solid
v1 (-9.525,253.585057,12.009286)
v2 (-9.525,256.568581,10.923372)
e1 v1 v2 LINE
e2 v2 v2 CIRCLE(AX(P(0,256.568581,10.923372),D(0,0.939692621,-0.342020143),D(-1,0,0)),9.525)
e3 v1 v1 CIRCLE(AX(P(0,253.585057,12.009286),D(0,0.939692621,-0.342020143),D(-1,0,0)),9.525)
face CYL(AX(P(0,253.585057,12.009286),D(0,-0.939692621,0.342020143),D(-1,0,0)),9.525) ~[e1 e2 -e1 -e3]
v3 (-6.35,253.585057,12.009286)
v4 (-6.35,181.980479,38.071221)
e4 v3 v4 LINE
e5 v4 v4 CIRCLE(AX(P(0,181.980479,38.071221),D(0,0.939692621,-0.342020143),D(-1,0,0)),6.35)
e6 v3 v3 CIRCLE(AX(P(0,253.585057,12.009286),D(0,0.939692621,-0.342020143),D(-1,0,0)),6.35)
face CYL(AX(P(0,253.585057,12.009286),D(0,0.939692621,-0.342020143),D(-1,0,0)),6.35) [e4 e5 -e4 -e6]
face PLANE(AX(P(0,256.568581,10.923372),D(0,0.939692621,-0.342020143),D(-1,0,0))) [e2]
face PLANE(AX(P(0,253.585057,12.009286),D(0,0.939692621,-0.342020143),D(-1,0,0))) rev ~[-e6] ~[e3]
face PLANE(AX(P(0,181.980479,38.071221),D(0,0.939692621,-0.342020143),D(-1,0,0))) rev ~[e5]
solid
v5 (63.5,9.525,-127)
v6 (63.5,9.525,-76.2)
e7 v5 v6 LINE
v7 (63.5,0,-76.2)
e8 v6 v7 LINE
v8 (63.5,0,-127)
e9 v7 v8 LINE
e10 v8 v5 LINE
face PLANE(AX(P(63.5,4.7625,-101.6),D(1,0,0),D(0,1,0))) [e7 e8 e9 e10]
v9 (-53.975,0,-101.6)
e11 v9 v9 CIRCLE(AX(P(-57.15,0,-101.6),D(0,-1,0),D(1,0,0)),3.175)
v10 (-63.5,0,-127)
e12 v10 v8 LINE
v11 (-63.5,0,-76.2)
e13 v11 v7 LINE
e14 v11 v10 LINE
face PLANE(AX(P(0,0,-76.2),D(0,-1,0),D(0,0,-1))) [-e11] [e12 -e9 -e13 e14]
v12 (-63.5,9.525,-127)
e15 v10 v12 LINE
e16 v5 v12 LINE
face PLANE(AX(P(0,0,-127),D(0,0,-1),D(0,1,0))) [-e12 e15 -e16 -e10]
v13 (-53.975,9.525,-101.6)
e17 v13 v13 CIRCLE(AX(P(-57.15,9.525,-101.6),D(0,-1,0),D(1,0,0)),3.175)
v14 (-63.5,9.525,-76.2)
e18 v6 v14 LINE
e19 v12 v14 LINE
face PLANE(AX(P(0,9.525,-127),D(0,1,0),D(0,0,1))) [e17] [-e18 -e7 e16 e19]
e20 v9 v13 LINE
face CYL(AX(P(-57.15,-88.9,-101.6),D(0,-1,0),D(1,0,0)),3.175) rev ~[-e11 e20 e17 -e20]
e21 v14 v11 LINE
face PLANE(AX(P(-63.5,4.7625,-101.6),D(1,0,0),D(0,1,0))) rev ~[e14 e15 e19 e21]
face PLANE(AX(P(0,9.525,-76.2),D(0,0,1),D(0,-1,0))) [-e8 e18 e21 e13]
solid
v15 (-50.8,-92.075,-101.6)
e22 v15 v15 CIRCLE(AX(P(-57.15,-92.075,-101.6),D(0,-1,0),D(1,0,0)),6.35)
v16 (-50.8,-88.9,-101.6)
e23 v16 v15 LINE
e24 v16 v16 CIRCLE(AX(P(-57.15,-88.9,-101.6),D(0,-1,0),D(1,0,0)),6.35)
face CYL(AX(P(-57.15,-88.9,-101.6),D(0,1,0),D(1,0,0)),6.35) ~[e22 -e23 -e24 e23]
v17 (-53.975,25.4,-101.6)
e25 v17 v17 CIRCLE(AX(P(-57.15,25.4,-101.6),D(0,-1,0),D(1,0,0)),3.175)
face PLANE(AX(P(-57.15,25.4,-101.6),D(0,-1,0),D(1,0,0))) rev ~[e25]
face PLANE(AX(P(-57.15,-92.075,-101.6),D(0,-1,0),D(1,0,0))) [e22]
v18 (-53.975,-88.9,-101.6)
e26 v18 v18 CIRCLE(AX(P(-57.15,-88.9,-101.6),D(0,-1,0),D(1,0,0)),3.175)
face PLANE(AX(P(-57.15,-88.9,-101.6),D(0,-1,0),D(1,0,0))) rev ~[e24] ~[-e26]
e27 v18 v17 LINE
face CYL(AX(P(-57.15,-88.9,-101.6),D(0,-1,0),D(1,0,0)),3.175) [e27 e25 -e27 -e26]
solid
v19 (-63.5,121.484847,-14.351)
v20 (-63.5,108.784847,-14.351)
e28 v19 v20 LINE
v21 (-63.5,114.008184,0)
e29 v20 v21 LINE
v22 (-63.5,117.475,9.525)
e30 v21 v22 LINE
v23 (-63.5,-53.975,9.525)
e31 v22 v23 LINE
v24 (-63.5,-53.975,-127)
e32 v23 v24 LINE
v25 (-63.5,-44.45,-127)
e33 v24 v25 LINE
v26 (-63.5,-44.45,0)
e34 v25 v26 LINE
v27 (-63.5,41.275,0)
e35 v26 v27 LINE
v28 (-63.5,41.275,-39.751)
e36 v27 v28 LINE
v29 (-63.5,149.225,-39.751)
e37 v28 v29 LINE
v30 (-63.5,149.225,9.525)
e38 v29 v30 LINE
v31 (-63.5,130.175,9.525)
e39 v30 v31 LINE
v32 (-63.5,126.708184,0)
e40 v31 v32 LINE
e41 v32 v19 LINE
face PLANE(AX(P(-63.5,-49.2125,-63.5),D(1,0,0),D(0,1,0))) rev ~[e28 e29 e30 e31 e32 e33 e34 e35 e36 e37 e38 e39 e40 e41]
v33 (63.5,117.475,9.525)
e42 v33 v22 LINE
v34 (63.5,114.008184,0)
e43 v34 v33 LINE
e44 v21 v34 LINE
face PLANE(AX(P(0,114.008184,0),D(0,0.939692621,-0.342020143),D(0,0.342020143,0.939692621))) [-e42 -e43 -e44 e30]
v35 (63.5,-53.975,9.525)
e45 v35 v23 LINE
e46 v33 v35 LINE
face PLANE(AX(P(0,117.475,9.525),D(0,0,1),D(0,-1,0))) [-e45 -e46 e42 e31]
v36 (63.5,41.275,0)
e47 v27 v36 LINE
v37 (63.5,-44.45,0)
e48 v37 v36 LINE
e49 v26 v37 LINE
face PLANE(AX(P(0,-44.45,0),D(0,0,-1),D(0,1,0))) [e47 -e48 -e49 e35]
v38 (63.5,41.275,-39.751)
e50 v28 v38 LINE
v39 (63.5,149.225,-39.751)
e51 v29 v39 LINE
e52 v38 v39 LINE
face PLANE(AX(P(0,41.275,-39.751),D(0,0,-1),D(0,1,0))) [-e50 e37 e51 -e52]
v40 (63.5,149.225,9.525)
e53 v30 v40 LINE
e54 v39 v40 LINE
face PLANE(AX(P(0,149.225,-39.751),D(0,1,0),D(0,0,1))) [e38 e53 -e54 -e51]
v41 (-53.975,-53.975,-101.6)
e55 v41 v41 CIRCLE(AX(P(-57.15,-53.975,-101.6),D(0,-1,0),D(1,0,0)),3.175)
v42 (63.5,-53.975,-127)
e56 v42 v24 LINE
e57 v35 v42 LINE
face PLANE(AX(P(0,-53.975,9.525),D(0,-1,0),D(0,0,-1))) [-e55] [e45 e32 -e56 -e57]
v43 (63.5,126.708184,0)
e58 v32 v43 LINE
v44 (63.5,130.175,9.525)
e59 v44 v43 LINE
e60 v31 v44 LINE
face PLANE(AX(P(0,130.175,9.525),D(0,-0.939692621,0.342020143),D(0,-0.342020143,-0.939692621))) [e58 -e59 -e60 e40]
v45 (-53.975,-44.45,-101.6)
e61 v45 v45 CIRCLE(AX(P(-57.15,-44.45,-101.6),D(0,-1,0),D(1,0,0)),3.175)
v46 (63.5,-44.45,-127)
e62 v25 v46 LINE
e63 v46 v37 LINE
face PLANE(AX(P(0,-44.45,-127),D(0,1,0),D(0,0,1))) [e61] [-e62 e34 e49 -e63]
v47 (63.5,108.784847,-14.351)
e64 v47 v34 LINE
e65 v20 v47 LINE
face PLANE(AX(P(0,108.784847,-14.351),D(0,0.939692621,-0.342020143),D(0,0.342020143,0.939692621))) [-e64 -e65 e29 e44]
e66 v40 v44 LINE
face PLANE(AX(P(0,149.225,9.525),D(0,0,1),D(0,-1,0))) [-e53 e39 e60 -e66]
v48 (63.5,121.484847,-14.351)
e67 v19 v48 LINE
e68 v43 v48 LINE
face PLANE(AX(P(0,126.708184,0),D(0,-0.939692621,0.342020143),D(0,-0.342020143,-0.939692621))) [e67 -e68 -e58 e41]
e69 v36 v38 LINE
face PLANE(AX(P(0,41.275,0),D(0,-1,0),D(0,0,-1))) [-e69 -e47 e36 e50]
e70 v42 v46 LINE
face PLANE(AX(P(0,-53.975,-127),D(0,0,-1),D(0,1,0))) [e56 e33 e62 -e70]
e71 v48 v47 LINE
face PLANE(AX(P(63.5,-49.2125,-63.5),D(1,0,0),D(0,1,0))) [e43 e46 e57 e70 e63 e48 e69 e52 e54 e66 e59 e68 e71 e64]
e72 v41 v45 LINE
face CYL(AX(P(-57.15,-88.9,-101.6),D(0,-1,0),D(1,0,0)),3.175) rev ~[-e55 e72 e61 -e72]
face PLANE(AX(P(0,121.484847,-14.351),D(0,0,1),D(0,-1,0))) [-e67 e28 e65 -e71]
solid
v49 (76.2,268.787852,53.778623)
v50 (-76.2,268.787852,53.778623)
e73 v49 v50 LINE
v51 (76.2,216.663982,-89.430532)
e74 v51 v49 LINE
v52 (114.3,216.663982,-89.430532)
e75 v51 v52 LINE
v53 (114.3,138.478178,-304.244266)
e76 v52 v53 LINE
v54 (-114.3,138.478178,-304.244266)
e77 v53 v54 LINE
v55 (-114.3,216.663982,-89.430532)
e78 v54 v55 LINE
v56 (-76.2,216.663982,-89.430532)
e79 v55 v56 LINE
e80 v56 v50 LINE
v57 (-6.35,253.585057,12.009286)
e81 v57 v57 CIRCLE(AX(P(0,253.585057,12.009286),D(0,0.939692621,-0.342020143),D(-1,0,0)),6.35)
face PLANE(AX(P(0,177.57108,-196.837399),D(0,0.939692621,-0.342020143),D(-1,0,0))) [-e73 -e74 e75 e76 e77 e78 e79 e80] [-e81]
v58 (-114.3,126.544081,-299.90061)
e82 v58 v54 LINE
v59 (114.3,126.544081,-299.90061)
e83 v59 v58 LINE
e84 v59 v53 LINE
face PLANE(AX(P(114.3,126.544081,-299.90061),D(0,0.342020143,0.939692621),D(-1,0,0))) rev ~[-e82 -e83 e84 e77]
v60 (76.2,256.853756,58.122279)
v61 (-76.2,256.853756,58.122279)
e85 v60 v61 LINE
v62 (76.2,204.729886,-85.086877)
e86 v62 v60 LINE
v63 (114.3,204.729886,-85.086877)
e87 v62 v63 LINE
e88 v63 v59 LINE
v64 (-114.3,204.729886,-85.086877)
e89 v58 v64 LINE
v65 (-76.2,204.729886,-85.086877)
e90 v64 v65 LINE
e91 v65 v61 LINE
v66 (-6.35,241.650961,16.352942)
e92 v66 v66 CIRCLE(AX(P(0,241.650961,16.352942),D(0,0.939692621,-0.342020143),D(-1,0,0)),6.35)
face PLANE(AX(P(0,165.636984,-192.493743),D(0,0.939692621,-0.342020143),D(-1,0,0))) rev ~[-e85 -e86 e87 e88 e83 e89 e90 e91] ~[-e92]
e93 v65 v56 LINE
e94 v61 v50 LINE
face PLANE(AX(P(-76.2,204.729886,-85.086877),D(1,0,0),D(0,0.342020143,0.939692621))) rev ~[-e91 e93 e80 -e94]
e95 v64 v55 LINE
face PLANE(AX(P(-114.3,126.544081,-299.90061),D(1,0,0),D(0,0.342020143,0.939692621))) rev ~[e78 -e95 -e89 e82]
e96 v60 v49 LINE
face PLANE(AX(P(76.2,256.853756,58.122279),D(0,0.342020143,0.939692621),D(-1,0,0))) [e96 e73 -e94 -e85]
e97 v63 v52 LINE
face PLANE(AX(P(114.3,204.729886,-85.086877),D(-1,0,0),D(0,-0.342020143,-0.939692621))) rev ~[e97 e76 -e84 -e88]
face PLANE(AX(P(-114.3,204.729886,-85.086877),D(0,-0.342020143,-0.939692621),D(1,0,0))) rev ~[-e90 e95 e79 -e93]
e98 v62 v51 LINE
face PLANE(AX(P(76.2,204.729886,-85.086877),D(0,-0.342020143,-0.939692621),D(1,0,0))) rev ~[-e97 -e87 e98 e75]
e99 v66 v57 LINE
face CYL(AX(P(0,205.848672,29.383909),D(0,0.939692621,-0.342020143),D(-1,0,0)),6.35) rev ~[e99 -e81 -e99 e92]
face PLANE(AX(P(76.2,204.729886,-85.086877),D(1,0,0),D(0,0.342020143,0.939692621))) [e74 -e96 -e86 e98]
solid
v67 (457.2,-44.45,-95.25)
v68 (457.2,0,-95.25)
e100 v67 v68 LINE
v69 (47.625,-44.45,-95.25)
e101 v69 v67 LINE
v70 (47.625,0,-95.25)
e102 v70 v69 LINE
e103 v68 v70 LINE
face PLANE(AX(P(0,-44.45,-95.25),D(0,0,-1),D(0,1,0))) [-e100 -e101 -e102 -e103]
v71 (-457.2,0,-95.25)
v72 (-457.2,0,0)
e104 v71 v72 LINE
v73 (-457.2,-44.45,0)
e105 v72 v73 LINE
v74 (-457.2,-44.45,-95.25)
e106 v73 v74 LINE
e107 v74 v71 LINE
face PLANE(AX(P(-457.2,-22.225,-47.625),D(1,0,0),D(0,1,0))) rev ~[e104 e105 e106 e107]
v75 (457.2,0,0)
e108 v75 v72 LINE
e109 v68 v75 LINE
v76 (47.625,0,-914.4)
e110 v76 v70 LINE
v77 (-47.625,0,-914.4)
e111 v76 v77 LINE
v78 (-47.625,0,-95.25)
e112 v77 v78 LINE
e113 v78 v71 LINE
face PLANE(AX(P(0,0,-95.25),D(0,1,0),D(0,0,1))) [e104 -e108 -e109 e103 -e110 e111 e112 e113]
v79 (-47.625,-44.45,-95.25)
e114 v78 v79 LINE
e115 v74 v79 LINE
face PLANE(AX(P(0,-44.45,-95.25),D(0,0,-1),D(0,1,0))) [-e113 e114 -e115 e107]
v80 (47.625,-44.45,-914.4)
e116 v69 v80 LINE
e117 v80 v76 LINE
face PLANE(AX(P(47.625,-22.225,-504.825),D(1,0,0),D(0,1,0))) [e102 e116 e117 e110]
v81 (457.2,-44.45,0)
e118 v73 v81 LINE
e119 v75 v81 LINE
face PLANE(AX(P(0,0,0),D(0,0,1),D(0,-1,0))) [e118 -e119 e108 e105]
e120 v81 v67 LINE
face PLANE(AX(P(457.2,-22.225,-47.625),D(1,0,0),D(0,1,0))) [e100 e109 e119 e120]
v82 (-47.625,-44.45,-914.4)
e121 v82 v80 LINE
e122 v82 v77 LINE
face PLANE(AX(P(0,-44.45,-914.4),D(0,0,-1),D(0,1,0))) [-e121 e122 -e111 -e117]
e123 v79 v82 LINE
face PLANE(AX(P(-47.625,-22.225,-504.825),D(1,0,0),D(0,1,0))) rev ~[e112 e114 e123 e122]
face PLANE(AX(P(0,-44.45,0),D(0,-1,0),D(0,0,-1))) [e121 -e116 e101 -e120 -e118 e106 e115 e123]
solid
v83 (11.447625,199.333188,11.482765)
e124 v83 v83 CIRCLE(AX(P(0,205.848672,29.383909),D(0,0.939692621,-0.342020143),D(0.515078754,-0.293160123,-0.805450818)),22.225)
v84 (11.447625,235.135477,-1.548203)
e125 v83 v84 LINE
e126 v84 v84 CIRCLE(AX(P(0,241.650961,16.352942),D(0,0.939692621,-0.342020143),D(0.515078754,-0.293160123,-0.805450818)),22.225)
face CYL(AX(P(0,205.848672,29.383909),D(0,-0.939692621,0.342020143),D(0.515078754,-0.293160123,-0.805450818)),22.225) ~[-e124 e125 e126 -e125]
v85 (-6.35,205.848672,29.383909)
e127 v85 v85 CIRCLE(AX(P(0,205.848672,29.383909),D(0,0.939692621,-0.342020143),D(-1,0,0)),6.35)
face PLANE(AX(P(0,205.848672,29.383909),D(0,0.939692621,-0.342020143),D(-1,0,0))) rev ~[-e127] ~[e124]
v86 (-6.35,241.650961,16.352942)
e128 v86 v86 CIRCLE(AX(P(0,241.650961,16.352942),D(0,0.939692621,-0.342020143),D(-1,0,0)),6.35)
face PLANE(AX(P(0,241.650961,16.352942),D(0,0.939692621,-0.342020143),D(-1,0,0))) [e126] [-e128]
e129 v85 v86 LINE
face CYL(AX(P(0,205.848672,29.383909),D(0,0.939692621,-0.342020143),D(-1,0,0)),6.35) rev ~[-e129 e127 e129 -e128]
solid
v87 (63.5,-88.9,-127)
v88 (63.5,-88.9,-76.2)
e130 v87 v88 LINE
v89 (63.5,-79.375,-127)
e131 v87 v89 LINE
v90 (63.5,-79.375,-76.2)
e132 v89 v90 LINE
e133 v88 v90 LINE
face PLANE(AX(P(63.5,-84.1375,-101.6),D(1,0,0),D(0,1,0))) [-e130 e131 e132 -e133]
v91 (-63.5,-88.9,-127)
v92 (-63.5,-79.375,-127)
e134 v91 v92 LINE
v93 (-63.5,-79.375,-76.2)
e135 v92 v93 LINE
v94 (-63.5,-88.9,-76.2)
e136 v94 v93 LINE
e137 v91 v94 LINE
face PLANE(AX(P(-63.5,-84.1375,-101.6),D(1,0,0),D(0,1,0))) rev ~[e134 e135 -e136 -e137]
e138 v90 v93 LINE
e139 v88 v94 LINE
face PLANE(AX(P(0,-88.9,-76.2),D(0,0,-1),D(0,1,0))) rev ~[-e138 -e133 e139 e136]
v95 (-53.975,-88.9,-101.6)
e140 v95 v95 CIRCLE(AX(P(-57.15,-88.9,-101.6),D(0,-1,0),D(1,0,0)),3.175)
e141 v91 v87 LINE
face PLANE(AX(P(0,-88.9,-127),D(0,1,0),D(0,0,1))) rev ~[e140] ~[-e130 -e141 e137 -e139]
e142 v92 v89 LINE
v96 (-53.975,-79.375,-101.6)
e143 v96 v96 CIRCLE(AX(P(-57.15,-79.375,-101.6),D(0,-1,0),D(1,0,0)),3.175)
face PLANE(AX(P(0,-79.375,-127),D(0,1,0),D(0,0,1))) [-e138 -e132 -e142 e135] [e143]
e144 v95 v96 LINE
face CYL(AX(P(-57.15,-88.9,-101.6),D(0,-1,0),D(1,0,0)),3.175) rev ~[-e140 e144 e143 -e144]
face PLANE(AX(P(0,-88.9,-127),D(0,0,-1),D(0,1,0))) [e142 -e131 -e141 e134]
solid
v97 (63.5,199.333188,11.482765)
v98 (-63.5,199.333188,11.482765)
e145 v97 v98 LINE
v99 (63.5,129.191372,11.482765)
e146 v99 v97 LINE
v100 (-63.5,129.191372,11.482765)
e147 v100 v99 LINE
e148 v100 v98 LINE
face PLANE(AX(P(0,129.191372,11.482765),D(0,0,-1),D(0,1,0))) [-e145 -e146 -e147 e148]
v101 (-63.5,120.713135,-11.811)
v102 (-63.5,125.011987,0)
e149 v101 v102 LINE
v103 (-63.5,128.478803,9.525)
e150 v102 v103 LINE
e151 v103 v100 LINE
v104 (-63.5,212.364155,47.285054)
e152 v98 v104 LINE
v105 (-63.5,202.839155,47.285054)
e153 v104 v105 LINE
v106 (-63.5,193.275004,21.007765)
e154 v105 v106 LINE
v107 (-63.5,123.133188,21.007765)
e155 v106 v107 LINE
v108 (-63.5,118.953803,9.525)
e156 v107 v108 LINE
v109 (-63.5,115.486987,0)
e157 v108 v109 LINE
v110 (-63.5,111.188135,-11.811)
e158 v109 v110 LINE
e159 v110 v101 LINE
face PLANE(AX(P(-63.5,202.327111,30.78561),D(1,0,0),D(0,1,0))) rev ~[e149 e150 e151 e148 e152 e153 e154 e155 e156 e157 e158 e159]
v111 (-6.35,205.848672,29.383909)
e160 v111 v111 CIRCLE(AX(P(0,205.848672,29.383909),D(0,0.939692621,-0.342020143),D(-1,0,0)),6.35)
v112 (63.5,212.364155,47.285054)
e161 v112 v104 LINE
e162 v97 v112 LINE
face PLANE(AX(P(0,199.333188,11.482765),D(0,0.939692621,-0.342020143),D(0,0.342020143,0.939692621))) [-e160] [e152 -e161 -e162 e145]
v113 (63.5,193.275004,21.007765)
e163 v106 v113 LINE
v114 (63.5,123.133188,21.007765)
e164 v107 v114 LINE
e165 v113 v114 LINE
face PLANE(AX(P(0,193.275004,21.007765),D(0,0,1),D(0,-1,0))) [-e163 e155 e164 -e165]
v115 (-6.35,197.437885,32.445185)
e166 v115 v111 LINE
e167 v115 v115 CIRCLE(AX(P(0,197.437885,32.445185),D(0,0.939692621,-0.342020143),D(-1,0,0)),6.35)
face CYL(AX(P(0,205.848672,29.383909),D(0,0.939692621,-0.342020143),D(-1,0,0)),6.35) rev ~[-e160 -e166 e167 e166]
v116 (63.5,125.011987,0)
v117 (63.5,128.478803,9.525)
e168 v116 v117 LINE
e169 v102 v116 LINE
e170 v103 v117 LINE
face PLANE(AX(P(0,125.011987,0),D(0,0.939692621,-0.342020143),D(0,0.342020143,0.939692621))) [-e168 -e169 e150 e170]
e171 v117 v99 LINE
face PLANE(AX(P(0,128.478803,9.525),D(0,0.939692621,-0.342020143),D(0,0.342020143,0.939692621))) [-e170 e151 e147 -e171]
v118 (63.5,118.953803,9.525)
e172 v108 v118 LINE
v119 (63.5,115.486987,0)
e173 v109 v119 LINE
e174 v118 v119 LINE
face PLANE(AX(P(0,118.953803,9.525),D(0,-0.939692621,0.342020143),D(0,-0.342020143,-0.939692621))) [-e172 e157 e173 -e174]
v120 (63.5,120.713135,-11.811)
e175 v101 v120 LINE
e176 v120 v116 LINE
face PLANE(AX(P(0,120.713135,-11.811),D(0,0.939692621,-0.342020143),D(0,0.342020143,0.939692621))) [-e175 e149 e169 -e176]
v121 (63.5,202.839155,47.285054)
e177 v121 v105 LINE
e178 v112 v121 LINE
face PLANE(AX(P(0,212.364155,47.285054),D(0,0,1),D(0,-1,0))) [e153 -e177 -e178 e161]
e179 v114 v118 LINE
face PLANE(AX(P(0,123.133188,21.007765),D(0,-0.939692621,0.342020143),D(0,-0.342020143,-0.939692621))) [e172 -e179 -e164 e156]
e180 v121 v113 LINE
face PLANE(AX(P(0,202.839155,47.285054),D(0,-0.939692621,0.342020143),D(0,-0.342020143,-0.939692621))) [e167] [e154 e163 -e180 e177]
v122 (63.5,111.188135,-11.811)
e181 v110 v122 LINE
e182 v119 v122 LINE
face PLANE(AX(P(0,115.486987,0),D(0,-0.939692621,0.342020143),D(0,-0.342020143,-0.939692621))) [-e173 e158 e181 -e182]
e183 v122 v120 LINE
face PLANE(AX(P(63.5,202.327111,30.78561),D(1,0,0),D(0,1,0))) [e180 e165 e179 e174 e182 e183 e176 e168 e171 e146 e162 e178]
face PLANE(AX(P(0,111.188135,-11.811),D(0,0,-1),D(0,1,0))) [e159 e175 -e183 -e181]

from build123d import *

# Parameters (mm, degrees)
F1_DEPTH  = 47.625
F2_DEPTH  = 457.2
F3_DEPTH  = 63.5
F0_W      = 9.525
F0_H      = 50.8
F4_DEPTH  = 63.5
F5_R      = 6.35
F6_DEPTH  = 38.1
F7_W      = 152.4
F7_H      = 152.4
F8_DEPTH  = 12.7
F9_DEPTH  = 76.2
F10_R     = 9.525
F10_R_2   = 6.35
F11_DEPTH = 3.175
F12_DEPTH = 76.2
F13_R     = 3.175
F14_DEPTH = 127
F15_DEPTH = 114.3
F16_DEPTH = 3.175


with BuildPart() as f1:
    # F0 (on Right) → F1 (new body, symmetric)
    with BuildSketch(Plane.YZ):
        Polygon((0, -95.25), (-44.45, -95.25), (-44.45, -127), (-44.45, -914.4), (0, -914.4), (0, -127), align=None)
    extrude(amount=F1_DEPTH, both=True)

    # F0 (on Right) → F2 (join, symmetric)
    with BuildSketch(Plane.YZ):
        Polygon((0, 0), (-44.45, 0), (-44.45, -95.25), (0, -95.25), (0, -76.2), align=None)
    extrude(amount=F2_DEPTH, both=True)


with BuildPart() as f3:
    # F0 (on Right) → F3 (new body, symmetric)
    with BuildSketch(Plane.YZ):
        Polygon((-44.45, -95.25), (-44.45, 0), (-53.975, 0), (-53.975, -127), (-44.45, -127), align=None)
        Polygon((-53.975, 0), (-44.45, 0), (0, 0), (41.275, 0), (114.0081835186, 0), (117.475, 9.525), (-53.975, 9.525), align=None)
        Polygon((114.0081835186, 0), (41.275, 0), (41.275, -39.751), (149.225, -39.751), (149.225, 0), (126.7081835186, 0), (121.4848466867, -14.351), (108.7848466867, -14.351), align=None)
        Polygon((126.7081835186, 0), (149.225, 0), (149.225, 9.525), (130.175, 9.525), align=None)
    extrude(amount=F3_DEPTH, both=True)


with BuildPart() as f3b:
    # F0 (on Right) → F3, piece 2 (new body, symmetric)
    with BuildSketch(Plane.YZ):
        Polygon((9.525, -76.2), (0, -76.2), (0, -95.25), (0, -127), (9.525, -127), align=None)
    extrude(amount=F3_DEPTH, both=True)


with BuildPart() as f3c:
    # F0 (on Right) → F3, piece 3 (new body, symmetric)
    with BuildSketch(Plane.YZ):
        with Locations((-84.1375, -101.6)):
            Rectangle(F0_W, F0_H)
    extrude(amount=F3_DEPTH, both=True)


with BuildPart() as f4:
    # F0 (on Right) → F4 (new body, symmetric)
    with BuildSketch(Plane.YZ):
        Polygon((202.8391554729, 47.2850536329), (193.2750044936, 21.0077647809), (199.3331880122, 21.0077647809), (199.3331880122, 11.4827647809), (212.3641554729, 47.2850536329), align=None)
        Polygon((199.3331880122, 21.0077647809), (193.2750044936, 21.0077647809), (189.8081880122, 11.4827647809), (199.3331880122, 11.4827647809), align=None)
        Polygon((132.6581880122, 21.0077647809), (129.1913715308, 11.4827647809), (130.887568106, 11.4827647809), (134.3543845873, 21.0077647809), align=None)
        Polygon((132.6581880122, 21.0077647809), (123.1331880122, 21.0077647809), (123.1331880122, 11.4827647809), (129.1913715308, 11.4827647809), align=None)
        Polygon((123.1331880122, 21.0077647809), (118.9538034249, 9.525), (128.4788034249, 9.525), (129.1913715308, 11.4827647809), (123.1331880122, 11.4827647809), align=None)
        Polygon((118.9538034249, 9.525), (115.4869869435, 0), (125.0119869435, 0), (128.4788034249, 9.525), align=None)
        Polygon((125.0119869435, 0), (115.4869869435, 0), (111.1881345066, -11.811), (120.7131345066, -11.811), align=None)
        Polygon((193.2750044936, 21.0077647809), (134.3543845873, 21.0077647809), (130.887568106, 11.4827647809), (189.8081880122, 11.4827647809), align=None)
    extrude(amount=F4_DEPTH, both=True)


with BuildPart() as f6:
    # F5 (on face) → F6 (new body)
    with BuildSketch(Plane(origin=(0, 172.325145046, -62.7212234124), x_dir=(-1, 0, 0), z_dir=(0, 0.9396926208, -0.3420201433))):
        with BuildLine():
            ThreePointArc((11.4476252996, 78.9662348644), (19.3439150288, 87.0725802482), (22.225, 98.0162348644))
            ThreePointArc((22.225, 98.0162348644), (19.3439150288, 108.9598894806), (11.4476252996, 117.0662348644))
            Line((11.4476252996, 117.0662348644), (-11.4476252996, 117.0662348644))
            ThreePointArc((-11.4476252996, 117.0662348644), (-22.225, 98.0162348644), (-11.4476252996, 78.9662348644))
            Line((-11.4476252996, 78.9662348644), (11.4476252996, 78.9662348644))
        make_face()
        with Locations((0, 98.0162348644)):
            Circle(F5_R, mode=Mode.SUBTRACT)
        with Locations((0, 98.0162348644)):
            Circle(F5_R)
        with BuildLine():
            Line((-11.4476252996, 117.0662348644), (11.4476252996, 117.0662348644))
            ThreePointArc((11.4476252996, 117.0662348644), (0, 120.2412348644), (-11.4476252996, 117.0662348644))
        make_face()
        with BuildLine():
            ThreePointArc((-11.4476252996, 78.9662348644), (0, 75.7912348644), (11.4476252996, 78.9662348644))
            Line((11.4476252996, 78.9662348644), (-11.4476252996, 78.9662348644))
        make_face()
    extrude(amount=F6_DEPTH)


with BuildPart() as f8:
    # F7 (on face) → F8 (new body)
    with BuildSketch(Plane(origin=(0, 208.127433898, -75.7521908731), x_dir=(-1, 0, 0), z_dir=(0, 0.9396926208, -0.3420201433))):
        Polygon((114.3, -9.9337651356), (76.2, -9.9337651356), (-76.2, -9.9337651356), (-114.3, -9.9337651356), (-114.3, -238.5337651356), (114.3, -238.5337651356), align=None)
        with Locations((0, 66.2662348644)):
            Rectangle(F7_W, F7_H)
    extrude(amount=F8_DEPTH)


with BuildPart() as f9_tool:
    # F5 (on face) → F9 (new body, symmetric)
    with BuildSketch(Plane(origin=(0, 172.325145046, -62.7212234124), x_dir=(-1, 0, 0), z_dir=(0, 0.9396926208, -0.3420201433))):
        with Locations((0, 98.0162348644)):
            Circle(F5_R)
    extrude(amount=F9_DEPTH, both=True)


with BuildPart() as f4_1:
    add(f4.part)

    # F9: cut by f9_tool
    add(f9_tool.part, mode=Mode.SUBTRACT)


with BuildPart() as f6_1:
    add(f6.part)

    # F9: cut by f9_tool
    add(f9_tool.part, mode=Mode.SUBTRACT)


with BuildPart() as f8_1:
    add(f8.part)

    # F9: cut by f9_tool
    add(f9_tool.part, mode=Mode.SUBTRACT)


with BuildPart() as f11:
    # F10 (on face) → F11 (new body)
    with BuildSketch(Plane(origin=(0, 220.0615301819, -80.0958466933), x_dir=(-1, 0, 0), z_dir=(0, 0.9396926208, -0.3420201433))):
        with Locations((0, 98.0162348644)):
            Circle(F10_R)
        with Locations((0, 98.0162348644)):
            Circle(F10_R_2, mode=Mode.SUBTRACT)
        with Locations((0, 98.0162348644)):
            Circle(F10_R_2)
    extrude(amount=F11_DEPTH)

    # F10 (on face) → F12 (join)
    with BuildSketch(Plane(origin=(0, 220.0615301819, -80.0958466933), x_dir=(-1, 0, 0), z_dir=(0, 0.9396926208, -0.3420201433))):
        with Locations((0, 98.0162348644)):
            Circle(F10_R_2)
    extrude(amount=-F12_DEPTH)


with BuildPart() as f14_tool:
    # F13 (on face) → F14 (new body)
    with BuildSketch(Plane.XZ.offset(88.9)):
        with Locations((-57.15, -101.6)):
            Circle(F13_R)
    extrude(amount=-F14_DEPTH)


with BuildPart() as f3_1:
    add(f3.part)

    # F14: cut by f14_tool
    add(f14_tool.part, mode=Mode.SUBTRACT)


with BuildPart() as f3b_1:
    add(f3b.part)

    # F14: cut by f14_tool
    add(f14_tool.part, mode=Mode.SUBTRACT)


with BuildPart() as f3c_1:
    add(f3c.part)

    # F14: cut by f14_tool
    add(f14_tool.part, mode=Mode.SUBTRACT)


with BuildPart() as f15:
    # F13 (on face) → F15 (new body)
    with BuildSketch(Plane.XZ.offset(88.9)):
        with Locations((-57.15, -101.6)):
            Circle(F13_R)
    extrude(amount=-F15_DEPTH)

    # F13 (on face) → F16 (join)
    with BuildSketch(Plane.XZ.offset(88.9)):
        with BuildLine():
            ThreePointArc((-63.5, -101.6), (-57.15, -107.95), (-50.8, -101.6))
            ThreePointArc((-50.8, -101.6), (-57.15, -95.25), (-63.5, -101.6))
        make_face()
        with Locations((-57.15, -101.6)):
            Circle(F13_R, mode=Mode.SUBTRACT)
        with Locations((-57.15, -101.6)):
            Circle(F13_R)
    extrude(amount=F16_DEPTH)


solid = Compound([f1.part, f4_1.part, f6_1.part, f8_1.part, f11.part, f3_1.part, f3b_1.part, f3c_1.part, f15.part])
